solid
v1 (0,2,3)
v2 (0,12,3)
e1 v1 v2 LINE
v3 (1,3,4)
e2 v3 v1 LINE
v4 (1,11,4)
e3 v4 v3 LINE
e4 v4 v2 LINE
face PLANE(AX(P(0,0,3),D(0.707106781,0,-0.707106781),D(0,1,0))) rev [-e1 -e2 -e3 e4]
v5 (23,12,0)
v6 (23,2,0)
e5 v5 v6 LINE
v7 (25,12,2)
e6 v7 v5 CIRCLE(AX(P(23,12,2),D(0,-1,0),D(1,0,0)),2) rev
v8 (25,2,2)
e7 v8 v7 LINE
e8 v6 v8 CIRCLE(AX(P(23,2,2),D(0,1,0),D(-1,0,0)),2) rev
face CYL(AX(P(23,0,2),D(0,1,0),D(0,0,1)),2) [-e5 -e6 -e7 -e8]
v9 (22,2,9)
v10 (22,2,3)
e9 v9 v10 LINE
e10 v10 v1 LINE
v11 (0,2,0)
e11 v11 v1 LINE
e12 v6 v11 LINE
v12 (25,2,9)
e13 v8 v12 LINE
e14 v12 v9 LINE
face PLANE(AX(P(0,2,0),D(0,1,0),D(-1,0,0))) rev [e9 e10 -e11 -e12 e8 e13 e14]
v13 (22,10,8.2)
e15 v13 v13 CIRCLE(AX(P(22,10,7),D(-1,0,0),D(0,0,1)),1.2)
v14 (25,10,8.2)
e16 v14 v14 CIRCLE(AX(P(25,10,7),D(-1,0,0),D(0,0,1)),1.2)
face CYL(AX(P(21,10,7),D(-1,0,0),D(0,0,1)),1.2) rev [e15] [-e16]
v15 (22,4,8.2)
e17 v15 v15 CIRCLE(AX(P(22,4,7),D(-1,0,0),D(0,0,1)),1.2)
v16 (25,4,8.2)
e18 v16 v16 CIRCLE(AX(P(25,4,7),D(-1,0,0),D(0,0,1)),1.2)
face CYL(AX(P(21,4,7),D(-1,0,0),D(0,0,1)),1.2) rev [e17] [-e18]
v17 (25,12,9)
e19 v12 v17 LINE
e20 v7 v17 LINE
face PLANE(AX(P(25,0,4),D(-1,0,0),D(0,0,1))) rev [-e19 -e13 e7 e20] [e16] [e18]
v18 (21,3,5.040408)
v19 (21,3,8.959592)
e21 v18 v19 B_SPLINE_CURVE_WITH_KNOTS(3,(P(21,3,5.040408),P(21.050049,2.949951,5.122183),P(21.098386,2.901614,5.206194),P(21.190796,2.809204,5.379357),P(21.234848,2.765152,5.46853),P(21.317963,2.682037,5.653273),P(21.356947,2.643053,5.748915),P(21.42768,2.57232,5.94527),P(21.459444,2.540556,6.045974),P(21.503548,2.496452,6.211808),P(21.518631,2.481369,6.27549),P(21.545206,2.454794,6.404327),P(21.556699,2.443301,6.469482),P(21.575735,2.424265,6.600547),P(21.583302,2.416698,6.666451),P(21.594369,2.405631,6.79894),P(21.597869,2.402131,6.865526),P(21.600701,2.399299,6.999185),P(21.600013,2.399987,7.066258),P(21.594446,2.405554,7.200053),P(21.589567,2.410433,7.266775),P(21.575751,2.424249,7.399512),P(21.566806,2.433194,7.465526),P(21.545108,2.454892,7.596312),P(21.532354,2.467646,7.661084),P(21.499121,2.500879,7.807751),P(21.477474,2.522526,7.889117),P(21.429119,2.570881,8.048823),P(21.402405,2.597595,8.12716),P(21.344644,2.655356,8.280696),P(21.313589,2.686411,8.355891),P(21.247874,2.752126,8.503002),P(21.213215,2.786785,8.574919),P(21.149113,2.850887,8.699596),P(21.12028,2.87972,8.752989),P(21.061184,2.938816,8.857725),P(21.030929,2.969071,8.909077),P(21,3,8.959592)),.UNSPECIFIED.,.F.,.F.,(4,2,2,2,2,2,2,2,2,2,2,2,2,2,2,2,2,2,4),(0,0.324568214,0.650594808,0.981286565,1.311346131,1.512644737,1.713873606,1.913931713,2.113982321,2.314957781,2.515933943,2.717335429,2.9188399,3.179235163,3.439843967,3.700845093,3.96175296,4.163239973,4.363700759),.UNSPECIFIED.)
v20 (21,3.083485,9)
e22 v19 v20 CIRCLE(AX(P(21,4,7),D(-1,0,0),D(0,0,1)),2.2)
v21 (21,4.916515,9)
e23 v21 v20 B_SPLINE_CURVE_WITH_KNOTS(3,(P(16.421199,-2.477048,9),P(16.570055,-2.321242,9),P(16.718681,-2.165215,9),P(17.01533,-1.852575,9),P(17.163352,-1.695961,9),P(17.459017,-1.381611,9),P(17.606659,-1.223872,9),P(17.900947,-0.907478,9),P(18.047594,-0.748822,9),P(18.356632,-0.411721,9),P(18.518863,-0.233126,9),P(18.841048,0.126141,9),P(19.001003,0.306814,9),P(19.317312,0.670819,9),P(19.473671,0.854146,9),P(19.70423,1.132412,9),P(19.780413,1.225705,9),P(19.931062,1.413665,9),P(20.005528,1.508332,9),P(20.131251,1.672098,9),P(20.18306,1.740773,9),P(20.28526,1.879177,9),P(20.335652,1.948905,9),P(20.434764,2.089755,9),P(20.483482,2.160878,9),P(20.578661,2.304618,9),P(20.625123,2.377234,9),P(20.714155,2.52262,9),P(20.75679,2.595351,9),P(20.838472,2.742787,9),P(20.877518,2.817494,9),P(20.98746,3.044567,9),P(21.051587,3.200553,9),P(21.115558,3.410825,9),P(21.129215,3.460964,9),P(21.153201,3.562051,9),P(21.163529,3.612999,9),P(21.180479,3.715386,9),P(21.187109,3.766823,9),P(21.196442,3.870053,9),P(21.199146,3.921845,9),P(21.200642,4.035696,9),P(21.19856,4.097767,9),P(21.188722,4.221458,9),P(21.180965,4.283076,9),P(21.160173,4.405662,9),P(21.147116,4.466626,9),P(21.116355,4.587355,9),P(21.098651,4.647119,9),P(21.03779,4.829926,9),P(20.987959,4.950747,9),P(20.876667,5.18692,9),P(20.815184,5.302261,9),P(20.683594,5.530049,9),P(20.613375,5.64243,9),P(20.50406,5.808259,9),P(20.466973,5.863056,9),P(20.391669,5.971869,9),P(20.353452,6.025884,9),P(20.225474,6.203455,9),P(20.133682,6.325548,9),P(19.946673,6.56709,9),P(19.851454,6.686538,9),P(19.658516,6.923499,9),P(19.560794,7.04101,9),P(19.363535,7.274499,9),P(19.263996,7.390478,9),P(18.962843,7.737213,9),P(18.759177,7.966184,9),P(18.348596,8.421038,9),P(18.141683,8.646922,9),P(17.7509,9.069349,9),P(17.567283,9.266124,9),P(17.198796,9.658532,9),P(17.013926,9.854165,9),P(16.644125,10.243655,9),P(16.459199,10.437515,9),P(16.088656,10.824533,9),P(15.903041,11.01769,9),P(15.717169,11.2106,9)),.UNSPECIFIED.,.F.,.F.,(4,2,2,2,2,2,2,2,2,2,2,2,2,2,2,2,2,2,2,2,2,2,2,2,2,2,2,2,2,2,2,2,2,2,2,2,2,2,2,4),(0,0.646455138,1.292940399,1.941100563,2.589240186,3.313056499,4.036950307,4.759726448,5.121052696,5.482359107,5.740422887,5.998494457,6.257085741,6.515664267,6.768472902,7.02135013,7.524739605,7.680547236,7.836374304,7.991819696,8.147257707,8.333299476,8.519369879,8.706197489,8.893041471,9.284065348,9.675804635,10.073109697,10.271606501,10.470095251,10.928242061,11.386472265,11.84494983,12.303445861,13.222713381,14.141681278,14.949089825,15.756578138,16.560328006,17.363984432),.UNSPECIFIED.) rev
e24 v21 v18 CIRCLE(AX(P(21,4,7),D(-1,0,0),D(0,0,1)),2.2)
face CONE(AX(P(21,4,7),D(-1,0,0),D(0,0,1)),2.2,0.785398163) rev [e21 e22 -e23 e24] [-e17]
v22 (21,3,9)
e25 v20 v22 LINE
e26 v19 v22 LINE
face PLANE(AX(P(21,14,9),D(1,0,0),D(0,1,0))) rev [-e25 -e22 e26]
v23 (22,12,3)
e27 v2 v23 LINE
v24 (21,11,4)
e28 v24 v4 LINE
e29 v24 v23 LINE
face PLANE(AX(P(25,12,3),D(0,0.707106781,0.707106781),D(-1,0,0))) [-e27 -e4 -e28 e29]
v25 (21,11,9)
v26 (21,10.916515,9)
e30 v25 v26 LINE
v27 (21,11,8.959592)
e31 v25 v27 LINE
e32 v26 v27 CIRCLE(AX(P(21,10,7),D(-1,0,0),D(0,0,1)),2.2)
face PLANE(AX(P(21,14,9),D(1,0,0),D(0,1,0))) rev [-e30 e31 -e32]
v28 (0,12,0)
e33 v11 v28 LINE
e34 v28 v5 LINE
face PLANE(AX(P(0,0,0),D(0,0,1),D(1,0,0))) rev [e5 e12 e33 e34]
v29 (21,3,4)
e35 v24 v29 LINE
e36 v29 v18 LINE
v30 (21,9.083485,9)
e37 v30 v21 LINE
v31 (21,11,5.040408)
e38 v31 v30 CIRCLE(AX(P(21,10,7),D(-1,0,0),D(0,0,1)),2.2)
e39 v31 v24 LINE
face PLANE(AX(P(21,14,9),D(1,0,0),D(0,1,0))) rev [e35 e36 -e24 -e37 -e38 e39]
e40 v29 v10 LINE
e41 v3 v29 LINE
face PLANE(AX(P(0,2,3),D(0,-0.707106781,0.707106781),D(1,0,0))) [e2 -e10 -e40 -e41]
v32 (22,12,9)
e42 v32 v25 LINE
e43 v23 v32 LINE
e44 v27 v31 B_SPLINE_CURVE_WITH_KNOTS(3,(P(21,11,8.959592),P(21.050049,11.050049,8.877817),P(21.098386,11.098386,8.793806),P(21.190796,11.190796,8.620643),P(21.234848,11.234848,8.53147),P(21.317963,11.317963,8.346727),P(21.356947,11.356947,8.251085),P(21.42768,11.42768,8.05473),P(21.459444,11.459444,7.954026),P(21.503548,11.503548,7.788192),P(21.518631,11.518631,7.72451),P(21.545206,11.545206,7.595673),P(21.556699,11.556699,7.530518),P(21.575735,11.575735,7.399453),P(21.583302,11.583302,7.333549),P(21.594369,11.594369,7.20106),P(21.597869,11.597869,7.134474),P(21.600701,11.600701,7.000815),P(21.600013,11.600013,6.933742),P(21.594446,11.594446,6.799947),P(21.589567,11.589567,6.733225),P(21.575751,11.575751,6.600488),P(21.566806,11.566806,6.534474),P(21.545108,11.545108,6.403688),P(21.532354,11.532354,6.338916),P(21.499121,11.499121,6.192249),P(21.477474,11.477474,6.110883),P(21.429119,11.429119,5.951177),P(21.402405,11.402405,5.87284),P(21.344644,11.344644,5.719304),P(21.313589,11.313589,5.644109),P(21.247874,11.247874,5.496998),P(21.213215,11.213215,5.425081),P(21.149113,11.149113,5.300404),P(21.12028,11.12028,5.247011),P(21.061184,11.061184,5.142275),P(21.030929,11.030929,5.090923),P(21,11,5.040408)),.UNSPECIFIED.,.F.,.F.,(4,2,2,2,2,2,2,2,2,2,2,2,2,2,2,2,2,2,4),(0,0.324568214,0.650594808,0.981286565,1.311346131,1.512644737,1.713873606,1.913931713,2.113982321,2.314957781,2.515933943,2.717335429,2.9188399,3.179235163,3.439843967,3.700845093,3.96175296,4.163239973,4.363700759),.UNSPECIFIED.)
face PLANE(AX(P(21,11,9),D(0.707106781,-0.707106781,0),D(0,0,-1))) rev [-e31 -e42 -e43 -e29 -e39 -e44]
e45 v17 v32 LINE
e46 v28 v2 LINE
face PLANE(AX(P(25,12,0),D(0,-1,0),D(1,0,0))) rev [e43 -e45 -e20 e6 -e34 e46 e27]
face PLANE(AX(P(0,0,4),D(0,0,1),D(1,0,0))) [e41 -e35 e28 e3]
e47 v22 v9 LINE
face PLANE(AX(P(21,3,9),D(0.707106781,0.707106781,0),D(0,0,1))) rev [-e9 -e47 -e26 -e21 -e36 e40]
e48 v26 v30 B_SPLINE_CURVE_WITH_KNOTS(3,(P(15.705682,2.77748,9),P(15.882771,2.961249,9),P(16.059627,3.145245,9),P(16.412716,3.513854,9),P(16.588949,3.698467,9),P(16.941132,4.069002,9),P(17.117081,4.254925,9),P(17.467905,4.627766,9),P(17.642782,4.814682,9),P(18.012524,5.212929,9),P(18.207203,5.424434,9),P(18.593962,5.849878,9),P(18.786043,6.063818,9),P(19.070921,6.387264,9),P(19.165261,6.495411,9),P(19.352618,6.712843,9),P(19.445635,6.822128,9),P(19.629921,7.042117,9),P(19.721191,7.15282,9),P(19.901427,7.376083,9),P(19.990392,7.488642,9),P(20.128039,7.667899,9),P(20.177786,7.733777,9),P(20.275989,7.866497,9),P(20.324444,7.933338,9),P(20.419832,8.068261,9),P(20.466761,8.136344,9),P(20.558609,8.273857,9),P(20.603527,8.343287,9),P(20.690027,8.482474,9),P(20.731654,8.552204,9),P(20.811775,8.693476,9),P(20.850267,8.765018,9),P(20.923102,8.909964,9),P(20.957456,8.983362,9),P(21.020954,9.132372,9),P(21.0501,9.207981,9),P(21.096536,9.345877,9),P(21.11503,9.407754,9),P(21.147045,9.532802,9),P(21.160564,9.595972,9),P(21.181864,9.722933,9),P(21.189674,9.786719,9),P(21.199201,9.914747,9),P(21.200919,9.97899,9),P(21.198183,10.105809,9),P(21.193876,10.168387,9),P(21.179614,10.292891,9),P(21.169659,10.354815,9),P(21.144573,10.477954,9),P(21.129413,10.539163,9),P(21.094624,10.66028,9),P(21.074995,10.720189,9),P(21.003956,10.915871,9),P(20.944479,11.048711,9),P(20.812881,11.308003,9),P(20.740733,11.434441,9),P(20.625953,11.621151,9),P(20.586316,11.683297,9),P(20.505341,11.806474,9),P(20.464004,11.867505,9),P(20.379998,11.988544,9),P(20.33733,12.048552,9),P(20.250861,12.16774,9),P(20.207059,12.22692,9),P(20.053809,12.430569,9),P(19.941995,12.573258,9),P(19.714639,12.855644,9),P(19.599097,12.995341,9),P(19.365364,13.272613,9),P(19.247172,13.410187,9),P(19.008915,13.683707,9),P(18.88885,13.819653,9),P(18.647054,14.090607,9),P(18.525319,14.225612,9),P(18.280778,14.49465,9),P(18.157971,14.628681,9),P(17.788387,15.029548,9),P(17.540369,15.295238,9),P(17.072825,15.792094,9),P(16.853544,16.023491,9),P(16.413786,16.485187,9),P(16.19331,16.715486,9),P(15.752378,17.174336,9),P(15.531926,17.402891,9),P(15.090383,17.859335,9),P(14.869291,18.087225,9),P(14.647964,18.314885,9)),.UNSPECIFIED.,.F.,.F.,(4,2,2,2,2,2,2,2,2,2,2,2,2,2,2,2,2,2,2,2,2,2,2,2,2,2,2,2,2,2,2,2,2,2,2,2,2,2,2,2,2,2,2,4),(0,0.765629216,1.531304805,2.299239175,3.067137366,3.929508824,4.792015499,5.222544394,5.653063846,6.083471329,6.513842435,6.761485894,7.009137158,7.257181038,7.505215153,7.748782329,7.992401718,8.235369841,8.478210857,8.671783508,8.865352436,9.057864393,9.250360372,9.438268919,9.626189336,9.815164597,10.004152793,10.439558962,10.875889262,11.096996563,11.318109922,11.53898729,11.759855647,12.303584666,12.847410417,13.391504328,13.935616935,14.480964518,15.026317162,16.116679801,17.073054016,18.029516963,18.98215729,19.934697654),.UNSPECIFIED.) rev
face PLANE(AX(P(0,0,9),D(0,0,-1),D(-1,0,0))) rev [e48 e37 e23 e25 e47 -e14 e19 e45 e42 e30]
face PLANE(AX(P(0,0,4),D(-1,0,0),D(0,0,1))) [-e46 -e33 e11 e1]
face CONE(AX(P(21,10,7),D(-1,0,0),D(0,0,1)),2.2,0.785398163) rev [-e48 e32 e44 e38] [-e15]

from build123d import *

# Parameters (mm, degrees)
ESBO_O1_W                                            = 25
ESBO_O1_H                                            = 14
RESSALTO_EXTRUS_O1_DEPTH                             = 4
ESBO_O2_W                                            = 4
ESBO_O2_H                                            = 14
RESSALTO_EXTRUS_O2_DEPTH                             = 5
ESBO_O4_W                                            = 25
ESBO_O4_H                                            = 2
CORTE_EXTRUS_O1_DEPTH                                = 31.033314835
ESCAREADO_PARA_PARAFUSO_COM_CABE_A_ESCAR_D           = 2.4
ESCAREADO_PARA_PARAFUSO_COM_CABE_A_ESCAR_DEPTH       = 15
ESCAREADO_PARA_PARAFUSO_COM_CABE_A_ESCAR_CSINK_D     = 4.4
ESCAREADO_PARA_PARAFUSO_COM_CABE_A_ESCAR_CSINK_ANGLE = 90
ESCAREADO_PARA_PARAFUSO_COM_CABE_A_ESCAR_TIP         = 0.721032743
FILETE1_R                                            = 2
CHANFRO1_SIZE                                        = 1


with BuildPart() as part:
    # Esboço1 → Ressalto-extrusão1 (new body)
    with BuildSketch(Plane.XY):
        with Locations((12.5, 7)):
            Rectangle(ESBO_O1_W, ESBO_O1_H)
    extrude(amount=RESSALTO_EXTRUS_O1_DEPTH)

    # Esboço2 → Ressalto-extrusão2 (add)
    with BuildSketch(Plane.XY.offset(4)):
        with Locations((23, 7)):
            Rectangle(ESBO_O2_W, ESBO_O2_H)
    extrude(amount=RESSALTO_EXTRUS_O2_DEPTH)

    # Esboço4 → Corte-extrusão1 (cut, through all)
    with BuildSketch(Plane.XY.offset(9)):
        with Locations((12.5, 13)):
            Rectangle(ESBO_O4_W, ESBO_O4_H)
        with Locations((12.5, 1)):
            Rectangle(ESBO_O4_W, ESBO_O4_H)
    extrude(amount=-CORTE_EXTRUS_O1_DEPTH, mode=Mode.SUBTRACT)

    # Escareado para parafuso com cabeça escareada chata de M21
    with Locations(Plane(origin=(21, 10, 7), x_dir=(0, -1, 0), z_dir=(-1, 0, 0))):
        with Locations((0, 0), (6, 0)):
            CounterSinkHole(ESCAREADO_PARA_PARAFUSO_COM_CABE_A_ESCAR_D / 2, ESCAREADO_PARA_PARAFUSO_COM_CABE_A_ESCAR_CSINK_D / 2, depth=ESCAREADO_PARA_PARAFUSO_COM_CABE_A_ESCAR_DEPTH, counter_sink_angle=ESCAREADO_PARA_PARAFUSO_COM_CABE_A_ESCAR_CSINK_ANGLE)
            with Locations((0, 0, -(ESCAREADO_PARA_PARAFUSO_COM_CABE_A_ESCAR_DEPTH + ESCAREADO_PARA_PARAFUSO_COM_CABE_A_ESCAR_TIP / 2))):  # 118° drill point
                Cone(0, ESCAREADO_PARA_PARAFUSO_COM_CABE_A_ESCAR_D / 2, ESCAREADO_PARA_PARAFUSO_COM_CABE_A_ESCAR_TIP, mode=Mode.SUBTRACT)

    # Filete1
    filete1_edges = [part.edges().sort_by_distance(p)[0] for p in [
        (25, 7, 0),
    ]]
    fillet(filete1_edges, radius=FILETE1_R)

    # Chanfro1
    # the kernel refuses this chamfer: 1 mm, written as the material it takes off along each edge
    with BuildSketch(Plane(origin=(0, 14.571682988, 4), x_dir=(-0.027495876610586365, 0, -0.9996219169112968), z_dir=(0, -1, 0))) as chanfro1_piece_1:
        Polygon((CHANFRO1_SIZE * 0.999621916911, CHANFRO1_SIZE * 0.0274958766106), (-CHANFRO1_SIZE * 0.0274958766106, CHANFRO1_SIZE * 0.999621916911), (0, 0), align=None)
    extrude(amount=15.143365976, mode=Mode.SUBTRACT)
    with BuildSketch(Plane(origin=(21, 12, 4), x_dir=(0, 0.02749587661058735, -0.9996219169112968), z_dir=(-1, 0, 0))) as chanfro1_piece_2:
        Polygon((CHANFRO1_SIZE * 0.999621916911, CHANFRO1_SIZE * 0.0274958766106), (-CHANFRO1_SIZE * 0.0274958766106, CHANFRO1_SIZE * 0.999621916911), (0, 0), align=None)
    extrude(amount=23.571682988, mode=Mode.SUBTRACT)
    with BuildSketch(Plane(origin=(21, 12, 5.344832151), x_dir=(0.9996219169112968, 0.027495876610585647, 0), z_dir=(0, 0, 1)), Plane(origin=(21, 2, 11.571682988), x_dir=(0.9996219169112968, -0.027495876610586726, 0), z_dir=(0, 0, -1))) as chanfro1_piece_3:
        Polygon((CHANFRO1_SIZE * 0.999621916911, -CHANFRO1_SIZE * 0.0274958766106), (-CHANFRO1_SIZE * 0.0274958766106, -CHANFRO1_SIZE * 0.999621916911), (0, 0), align=None)
    extrude(amount=6.226850837, mode=Mode.SUBTRACT)
    with BuildSketch(Plane(origin=(-2.571682988, 2, 4), x_dir=(0, 0.9996219169112968, 0.027495876610586487), z_dir=(1, 0, 0))) as chanfro1_piece_4:
        Polygon((CHANFRO1_SIZE * 0.999621916911, -CHANFRO1_SIZE * 0.0274958766106), (-CHANFRO1_SIZE * 0.0274958766106, -CHANFRO1_SIZE * 0.999621916911), (0, 0), align=None)
    extrude(amount=23.571682988, mode=Mode.SUBTRACT)
    with BuildSketch(Plane(origin=(21, 2, 8.655167849), x_dir=(-0.027495876610585623, 0.9996219169112968, 0), z_dir=(0, 0, -1))) as chanfro1_piece_5:
        Polygon((CHANFRO1_SIZE * 0.999621916911, CHANFRO1_SIZE * 0.0274958766106), (-CHANFRO1_SIZE * 0.0274958766106, CHANFRO1_SIZE * 0.999621916911), (0, 0), align=None)
    extrude(amount=4.655167849, mode=Mode.SUBTRACT)
    with BuildSketch(Plane(origin=(21, 12, 4), x_dir=(0.9996219169112968, 0.027495876610585647, 0), z_dir=(0, 0, 1))) as chanfro1_piece_6:
        Polygon((CHANFRO1_SIZE * 0.999621916911, -CHANFRO1_SIZE * 0.0274958766106), (-CHANFRO1_SIZE * 0.0274958766106, -CHANFRO1_SIZE * 0.999621916911), (0, 0), align=None)
    extrude(amount=4.655167849, mode=Mode.SUBTRACT)
    with BuildSketch(Plane(origin=(23.571682988, 12, 4), x_dir=(0, 0.027495876610585623, -0.9996219169112968), z_dir=(-1, 0, 0))) as chanfro1_piece_7a_section:
        Polygon((CHANFRO1_SIZE * 0.999621916911, CHANFRO1_SIZE * 0.0274958766106), (-CHANFRO1_SIZE * 0.0274958766106, CHANFRO1_SIZE * 0.999621916911), (0, 0), align=None)
    chanfro1_piece_7a = extrude(amount=26.143365976, mode=Mode.PRIVATE)
    chanfro1_piece_7a = split(chanfro1_piece_7a, bisect_by=Plane(origin=(21, 11.670206373, 3.670206373), z_dir=(1, 0, 0)), keep=Keep.TOP, mode=Mode.PRIVATE)
    with BuildSketch(Plane(origin=(21, 12, 1.428317012), x_dir=(0.9996219169112968, 0.027495876610585647, 0), z_dir=(0, 0, 1))) as chanfro1_piece_7b_section:
        Polygon((CHANFRO1_SIZE * 0.999621916911, -CHANFRO1_SIZE * 0.0274958766106), (-CHANFRO1_SIZE * 0.0274958766106, -CHANFRO1_SIZE * 0.999621916911), (0, 0), align=None)
    chanfro1_piece_7b = extrude(amount=7.226850837, mode=Mode.PRIVATE)
    chanfro1_piece_7b = split(chanfro1_piece_7b, bisect_by=Plane(origin=(21.329793627, 11.670206373, 4), z_dir=(0, 0, -1)), keep=Keep.TOP, mode=Mode.PRIVATE)
    chanfro1_piece_7 = chanfro1_piece_7a & chanfro1_piece_7b
    add(chanfro1_piece_7, mode=Mode.SUBTRACT)
    with BuildSketch(Plane(origin=(-2.571682988, 2, 4), x_dir=(0, 0.9996219169112968, 0.027495876610586487), z_dir=(1, 0, 0))) as chanfro1_piece_8a_section:
        Polygon((CHANFRO1_SIZE * 0.999621916911, -CHANFRO1_SIZE * 0.0274958766106), (-CHANFRO1_SIZE * 0.0274958766106, -CHANFRO1_SIZE * 0.999621916911), (0, 0), align=None)
    chanfro1_piece_8a = extrude(amount=26.143365976, mode=Mode.PRIVATE)
    chanfro1_piece_8a = split(chanfro1_piece_8a, bisect_by=Plane(origin=(21, 2.329793627, 3.670206373), z_dir=(1, 0, 0)), keep=Keep.TOP, mode=Mode.PRIVATE)
    with BuildSketch(Plane(origin=(21, 2, 8.655167849), x_dir=(-0.027495876610585623, 0.9996219169112968, 0), z_dir=(0, 0, -1))) as chanfro1_piece_8b_section:
        Polygon((CHANFRO1_SIZE * 0.999621916911, CHANFRO1_SIZE * 0.0274958766106), (-CHANFRO1_SIZE * 0.0274958766106, CHANFRO1_SIZE * 0.999621916911), (0, 0), align=None)
    chanfro1_piece_8b = extrude(amount=7.226850837, mode=Mode.PRIVATE)
    chanfro1_piece_8b = split(chanfro1_piece_8b, bisect_by=Plane(origin=(21.329793627, 2.329793627, 4), z_dir=(0, 0, -1)), keep=Keep.TOP, mode=Mode.PRIVATE)
    chanfro1_piece_8 = chanfro1_piece_8a & chanfro1_piece_8b
    add(chanfro1_piece_8, mode=Mode.SUBTRACT)


solid = part.part
